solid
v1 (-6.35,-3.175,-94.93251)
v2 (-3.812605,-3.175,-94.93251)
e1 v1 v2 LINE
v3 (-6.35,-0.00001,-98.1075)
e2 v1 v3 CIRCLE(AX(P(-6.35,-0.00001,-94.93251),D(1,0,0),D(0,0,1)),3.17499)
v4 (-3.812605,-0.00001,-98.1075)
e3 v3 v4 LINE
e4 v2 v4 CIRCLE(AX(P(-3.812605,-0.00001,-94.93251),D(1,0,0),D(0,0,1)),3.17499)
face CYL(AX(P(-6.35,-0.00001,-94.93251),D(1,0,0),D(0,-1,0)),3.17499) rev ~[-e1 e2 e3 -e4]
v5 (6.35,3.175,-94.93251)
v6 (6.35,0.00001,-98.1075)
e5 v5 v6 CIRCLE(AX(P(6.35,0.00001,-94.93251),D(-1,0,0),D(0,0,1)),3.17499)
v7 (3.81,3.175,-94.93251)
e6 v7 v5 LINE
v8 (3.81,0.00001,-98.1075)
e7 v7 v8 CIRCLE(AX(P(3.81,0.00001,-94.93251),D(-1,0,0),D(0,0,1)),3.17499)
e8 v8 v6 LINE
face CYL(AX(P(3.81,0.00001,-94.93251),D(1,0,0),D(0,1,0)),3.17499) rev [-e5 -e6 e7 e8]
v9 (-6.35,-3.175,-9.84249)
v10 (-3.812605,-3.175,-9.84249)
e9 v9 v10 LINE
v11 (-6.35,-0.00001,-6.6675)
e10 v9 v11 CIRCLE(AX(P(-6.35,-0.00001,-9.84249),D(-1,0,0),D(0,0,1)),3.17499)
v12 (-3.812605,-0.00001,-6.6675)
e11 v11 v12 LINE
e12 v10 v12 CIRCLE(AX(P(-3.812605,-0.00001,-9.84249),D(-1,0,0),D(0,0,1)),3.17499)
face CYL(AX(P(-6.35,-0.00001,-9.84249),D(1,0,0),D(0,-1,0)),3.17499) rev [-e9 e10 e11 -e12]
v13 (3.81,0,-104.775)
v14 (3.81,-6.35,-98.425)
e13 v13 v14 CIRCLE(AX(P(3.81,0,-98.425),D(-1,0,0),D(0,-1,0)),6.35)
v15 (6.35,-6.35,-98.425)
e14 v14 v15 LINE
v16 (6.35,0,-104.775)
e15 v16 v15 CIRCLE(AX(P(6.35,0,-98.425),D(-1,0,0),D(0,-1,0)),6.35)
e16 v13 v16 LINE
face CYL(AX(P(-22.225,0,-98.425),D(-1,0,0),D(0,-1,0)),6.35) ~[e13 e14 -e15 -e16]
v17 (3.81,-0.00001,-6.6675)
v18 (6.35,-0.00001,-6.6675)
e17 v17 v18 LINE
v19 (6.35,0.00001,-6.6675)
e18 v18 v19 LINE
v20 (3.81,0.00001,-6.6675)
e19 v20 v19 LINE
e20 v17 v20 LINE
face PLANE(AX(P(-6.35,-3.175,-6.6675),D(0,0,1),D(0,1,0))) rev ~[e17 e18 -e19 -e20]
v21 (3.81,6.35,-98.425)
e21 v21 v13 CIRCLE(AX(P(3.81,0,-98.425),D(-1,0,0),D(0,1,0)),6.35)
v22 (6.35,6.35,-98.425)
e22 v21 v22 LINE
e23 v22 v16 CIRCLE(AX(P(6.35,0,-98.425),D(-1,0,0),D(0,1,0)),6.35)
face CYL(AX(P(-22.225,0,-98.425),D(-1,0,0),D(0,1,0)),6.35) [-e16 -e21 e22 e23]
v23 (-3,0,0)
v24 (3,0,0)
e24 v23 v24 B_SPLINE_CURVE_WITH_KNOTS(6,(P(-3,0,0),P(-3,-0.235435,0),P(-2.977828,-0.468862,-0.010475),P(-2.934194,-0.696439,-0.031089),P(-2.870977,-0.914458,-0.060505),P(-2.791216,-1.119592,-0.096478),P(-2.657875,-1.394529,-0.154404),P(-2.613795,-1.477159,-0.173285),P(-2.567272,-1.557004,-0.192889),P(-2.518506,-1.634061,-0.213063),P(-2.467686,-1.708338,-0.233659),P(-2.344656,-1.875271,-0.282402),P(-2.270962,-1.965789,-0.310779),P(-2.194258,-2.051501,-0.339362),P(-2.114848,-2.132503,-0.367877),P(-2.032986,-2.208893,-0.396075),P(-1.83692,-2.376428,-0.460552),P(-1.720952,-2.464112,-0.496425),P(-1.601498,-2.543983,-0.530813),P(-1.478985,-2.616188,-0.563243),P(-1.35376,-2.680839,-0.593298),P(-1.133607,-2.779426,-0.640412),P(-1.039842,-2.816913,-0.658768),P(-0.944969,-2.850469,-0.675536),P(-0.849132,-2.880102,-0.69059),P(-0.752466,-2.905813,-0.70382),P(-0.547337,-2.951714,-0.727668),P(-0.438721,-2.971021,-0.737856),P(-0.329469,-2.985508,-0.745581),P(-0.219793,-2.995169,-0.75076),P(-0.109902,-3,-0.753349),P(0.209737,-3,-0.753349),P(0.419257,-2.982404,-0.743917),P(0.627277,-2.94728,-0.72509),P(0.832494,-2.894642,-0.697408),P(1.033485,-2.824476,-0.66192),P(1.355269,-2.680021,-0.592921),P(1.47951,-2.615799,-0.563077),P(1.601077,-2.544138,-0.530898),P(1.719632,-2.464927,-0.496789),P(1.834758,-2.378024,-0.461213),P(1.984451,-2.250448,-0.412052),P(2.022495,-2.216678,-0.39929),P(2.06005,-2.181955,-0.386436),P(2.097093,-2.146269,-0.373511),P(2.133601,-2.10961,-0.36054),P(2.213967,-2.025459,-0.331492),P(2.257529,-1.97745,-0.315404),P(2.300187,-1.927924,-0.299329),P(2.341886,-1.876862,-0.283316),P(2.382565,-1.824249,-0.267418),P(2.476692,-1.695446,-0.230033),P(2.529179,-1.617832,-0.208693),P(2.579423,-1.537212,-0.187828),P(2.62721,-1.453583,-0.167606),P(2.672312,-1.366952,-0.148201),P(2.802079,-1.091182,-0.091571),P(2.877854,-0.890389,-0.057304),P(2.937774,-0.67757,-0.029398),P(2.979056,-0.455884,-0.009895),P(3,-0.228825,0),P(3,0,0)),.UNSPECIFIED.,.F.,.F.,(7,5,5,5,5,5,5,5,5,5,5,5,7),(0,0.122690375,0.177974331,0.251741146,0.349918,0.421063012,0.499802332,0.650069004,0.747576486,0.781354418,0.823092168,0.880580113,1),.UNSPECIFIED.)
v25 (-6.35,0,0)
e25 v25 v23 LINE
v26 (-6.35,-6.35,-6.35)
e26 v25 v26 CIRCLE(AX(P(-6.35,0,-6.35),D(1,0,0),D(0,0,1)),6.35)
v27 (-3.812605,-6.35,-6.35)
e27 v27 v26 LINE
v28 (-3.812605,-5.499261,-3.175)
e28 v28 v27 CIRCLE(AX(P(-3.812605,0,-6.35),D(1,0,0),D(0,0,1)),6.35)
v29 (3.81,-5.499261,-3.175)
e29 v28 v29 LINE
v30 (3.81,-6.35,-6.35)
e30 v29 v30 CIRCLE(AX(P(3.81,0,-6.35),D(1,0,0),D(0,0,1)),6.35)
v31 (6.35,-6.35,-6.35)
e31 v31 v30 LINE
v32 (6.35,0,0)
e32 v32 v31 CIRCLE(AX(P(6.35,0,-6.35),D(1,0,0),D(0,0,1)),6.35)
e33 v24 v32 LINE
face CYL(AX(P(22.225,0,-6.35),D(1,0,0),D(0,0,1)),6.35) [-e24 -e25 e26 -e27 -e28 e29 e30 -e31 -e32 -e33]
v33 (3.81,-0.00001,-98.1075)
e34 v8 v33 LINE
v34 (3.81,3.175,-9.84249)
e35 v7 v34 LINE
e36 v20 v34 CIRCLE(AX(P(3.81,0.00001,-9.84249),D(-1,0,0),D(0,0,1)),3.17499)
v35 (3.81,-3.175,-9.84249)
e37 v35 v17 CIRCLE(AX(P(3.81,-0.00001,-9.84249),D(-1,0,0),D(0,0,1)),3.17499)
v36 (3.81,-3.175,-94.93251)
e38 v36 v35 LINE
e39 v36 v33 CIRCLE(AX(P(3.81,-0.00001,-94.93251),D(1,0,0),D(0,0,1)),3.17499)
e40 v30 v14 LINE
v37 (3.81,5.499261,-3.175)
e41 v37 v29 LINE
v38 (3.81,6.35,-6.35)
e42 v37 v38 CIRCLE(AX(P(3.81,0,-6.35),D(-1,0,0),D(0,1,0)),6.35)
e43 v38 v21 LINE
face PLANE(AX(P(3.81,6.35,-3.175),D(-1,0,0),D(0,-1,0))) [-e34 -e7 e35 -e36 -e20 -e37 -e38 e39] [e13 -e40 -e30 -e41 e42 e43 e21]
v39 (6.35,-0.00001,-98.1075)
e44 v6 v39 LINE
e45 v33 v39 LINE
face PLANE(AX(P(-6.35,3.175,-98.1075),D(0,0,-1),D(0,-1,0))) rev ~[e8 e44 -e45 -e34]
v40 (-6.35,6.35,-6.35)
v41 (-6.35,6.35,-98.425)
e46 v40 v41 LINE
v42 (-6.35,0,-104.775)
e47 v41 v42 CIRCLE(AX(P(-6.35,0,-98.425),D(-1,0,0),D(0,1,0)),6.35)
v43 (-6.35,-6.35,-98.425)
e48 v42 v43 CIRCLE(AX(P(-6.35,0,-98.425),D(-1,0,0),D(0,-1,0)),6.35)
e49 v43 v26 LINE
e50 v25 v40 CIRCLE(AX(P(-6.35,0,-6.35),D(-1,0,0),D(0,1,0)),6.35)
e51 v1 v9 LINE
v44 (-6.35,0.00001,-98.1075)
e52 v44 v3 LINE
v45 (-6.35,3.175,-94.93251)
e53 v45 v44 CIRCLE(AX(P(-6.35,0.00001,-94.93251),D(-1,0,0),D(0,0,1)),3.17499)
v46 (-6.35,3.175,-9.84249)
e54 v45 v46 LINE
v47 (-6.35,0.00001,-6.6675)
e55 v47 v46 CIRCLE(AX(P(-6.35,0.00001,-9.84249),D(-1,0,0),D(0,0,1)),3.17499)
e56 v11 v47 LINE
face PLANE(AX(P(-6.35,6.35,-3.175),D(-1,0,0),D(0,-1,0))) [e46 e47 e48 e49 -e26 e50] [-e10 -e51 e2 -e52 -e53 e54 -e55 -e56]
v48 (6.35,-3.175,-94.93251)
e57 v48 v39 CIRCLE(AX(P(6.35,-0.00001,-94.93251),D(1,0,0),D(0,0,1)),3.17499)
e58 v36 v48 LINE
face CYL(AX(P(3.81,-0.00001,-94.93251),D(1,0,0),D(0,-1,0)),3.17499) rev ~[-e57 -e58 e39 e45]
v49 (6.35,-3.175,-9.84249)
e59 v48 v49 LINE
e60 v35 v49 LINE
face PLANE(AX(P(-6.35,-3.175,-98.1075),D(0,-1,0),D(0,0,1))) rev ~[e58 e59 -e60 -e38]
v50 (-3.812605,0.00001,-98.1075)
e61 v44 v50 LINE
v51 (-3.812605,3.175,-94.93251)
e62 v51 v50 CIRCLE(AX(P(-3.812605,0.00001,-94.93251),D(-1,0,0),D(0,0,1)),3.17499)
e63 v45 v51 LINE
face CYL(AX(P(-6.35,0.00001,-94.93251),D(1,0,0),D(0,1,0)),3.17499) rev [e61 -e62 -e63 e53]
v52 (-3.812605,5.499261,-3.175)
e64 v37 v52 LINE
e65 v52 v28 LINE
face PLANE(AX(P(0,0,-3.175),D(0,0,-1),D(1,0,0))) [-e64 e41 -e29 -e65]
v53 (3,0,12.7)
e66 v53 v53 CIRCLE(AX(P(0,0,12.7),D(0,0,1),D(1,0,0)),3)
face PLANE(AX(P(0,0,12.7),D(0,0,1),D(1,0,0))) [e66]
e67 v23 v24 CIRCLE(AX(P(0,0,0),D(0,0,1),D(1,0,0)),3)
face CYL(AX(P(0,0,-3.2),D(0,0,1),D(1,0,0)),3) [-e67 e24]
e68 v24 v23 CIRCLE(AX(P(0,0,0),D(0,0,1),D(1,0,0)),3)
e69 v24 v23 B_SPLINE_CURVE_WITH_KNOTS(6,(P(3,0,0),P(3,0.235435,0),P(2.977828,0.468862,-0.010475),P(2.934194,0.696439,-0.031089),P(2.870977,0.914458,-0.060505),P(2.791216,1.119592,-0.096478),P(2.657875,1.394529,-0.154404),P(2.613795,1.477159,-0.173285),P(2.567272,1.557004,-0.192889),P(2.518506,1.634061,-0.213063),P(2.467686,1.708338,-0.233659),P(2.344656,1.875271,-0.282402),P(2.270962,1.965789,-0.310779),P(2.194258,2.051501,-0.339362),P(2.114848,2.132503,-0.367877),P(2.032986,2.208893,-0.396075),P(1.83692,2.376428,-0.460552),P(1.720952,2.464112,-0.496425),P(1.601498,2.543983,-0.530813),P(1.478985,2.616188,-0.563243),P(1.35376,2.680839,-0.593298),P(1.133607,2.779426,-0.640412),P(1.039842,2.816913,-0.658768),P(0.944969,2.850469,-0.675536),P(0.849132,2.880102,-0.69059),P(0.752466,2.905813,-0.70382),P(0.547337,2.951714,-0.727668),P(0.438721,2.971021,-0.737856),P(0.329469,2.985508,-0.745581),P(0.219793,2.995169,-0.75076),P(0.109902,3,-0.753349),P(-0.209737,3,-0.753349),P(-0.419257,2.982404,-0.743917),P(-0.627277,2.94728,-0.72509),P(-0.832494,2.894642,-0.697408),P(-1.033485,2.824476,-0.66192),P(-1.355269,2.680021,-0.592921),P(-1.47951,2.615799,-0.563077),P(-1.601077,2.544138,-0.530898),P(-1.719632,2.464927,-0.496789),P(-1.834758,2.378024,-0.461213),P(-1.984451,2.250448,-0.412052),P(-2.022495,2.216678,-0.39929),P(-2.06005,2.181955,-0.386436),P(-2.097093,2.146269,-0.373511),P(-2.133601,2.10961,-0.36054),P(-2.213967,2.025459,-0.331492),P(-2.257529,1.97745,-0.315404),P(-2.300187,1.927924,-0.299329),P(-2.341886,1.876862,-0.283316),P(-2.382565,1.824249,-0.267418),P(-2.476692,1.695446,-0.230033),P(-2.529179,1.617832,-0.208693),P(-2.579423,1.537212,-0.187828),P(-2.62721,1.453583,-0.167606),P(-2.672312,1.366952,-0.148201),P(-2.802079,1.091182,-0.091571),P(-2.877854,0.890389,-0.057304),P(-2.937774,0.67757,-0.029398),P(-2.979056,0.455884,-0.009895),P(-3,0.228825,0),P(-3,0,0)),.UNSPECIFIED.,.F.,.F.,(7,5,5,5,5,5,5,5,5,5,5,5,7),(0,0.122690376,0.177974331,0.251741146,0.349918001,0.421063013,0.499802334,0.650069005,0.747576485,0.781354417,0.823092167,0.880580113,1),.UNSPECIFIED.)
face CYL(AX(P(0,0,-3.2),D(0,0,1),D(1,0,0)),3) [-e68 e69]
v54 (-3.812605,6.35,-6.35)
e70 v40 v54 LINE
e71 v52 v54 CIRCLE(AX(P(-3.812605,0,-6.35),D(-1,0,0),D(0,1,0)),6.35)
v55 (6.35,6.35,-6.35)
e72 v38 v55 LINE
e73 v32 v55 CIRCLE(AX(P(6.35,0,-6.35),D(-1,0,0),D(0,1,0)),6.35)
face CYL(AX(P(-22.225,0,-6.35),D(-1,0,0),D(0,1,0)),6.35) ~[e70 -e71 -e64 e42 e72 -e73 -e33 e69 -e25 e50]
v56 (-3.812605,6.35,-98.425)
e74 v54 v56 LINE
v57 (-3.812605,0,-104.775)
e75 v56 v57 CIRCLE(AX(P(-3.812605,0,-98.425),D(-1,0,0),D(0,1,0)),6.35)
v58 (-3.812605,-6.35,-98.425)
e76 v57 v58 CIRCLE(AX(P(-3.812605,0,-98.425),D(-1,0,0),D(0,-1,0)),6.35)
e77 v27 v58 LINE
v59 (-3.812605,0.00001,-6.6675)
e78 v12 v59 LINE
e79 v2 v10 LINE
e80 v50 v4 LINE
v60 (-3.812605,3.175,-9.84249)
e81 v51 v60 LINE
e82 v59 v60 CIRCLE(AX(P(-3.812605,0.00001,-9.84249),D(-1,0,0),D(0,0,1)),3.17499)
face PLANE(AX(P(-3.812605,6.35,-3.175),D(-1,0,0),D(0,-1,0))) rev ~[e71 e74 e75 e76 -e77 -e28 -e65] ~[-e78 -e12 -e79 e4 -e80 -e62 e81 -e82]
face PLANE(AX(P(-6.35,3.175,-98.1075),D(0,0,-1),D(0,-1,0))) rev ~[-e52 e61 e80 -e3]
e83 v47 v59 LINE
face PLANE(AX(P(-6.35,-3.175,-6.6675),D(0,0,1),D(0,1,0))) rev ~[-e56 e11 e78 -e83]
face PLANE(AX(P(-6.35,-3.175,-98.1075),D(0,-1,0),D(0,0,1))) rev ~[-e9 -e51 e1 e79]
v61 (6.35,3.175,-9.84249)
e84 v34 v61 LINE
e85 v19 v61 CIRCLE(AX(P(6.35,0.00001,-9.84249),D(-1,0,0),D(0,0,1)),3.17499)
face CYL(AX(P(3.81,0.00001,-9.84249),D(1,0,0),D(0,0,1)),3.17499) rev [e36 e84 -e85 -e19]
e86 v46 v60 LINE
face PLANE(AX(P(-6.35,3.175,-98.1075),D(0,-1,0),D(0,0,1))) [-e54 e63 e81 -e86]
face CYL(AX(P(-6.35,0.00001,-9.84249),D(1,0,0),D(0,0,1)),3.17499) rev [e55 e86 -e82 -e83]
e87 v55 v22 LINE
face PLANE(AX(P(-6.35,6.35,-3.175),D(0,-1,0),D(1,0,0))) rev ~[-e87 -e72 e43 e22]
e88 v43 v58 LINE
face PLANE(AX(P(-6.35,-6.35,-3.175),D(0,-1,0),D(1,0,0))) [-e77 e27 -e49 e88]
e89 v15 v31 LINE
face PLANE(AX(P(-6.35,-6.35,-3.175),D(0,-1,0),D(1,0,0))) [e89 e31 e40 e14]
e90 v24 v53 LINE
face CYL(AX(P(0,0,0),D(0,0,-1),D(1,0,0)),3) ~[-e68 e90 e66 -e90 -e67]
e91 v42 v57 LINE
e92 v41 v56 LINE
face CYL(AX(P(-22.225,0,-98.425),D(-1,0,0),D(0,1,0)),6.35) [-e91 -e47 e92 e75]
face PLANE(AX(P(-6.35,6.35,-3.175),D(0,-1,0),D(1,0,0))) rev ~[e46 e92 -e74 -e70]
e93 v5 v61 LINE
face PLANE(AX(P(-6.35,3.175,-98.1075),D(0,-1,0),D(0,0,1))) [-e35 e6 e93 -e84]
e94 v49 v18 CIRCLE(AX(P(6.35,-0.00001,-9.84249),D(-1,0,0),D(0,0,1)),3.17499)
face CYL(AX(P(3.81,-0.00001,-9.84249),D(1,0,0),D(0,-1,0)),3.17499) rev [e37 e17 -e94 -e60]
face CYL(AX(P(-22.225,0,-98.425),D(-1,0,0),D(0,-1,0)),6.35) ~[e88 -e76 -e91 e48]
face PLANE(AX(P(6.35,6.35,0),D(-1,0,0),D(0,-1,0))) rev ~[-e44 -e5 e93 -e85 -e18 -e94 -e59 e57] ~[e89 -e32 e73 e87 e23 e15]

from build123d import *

# Parameters (mm, degrees)
F0_R         = 3
F1_DEPTH     = 12.7
F2_W         = 12.7
F2_H         = 12.7
F3_DEPTH     = 3.175
F4_W         = 2.5373954162
F4_H         = 12.7
F4_W_2       = 2.54
F5_DEPTH     = 101.6
F6_T1_DEPTH  = 34.2873954162
F6_T3_DEPTH  = 34.29
F6_T8_DEPTH  = 44.45
F6_S9_R      = 3
F6_T10_DEPTH = 24
F6_T14_DEPTH = 44.45
F6_S15_R     = 3
F6_T16_DEPTH = 24
F7_W         = 3.175
F7_H         = 91.44
F8_DEPTH     = 25.4
F9_R         = 3.17499


# Not quite as in the source:
# - a fillet or chamfer that OpenCascade refuses, or shapes differently, is made with other operations: its cross-section is extruded or revolved along the edge and cut away or added
# - a fillet or chamfer is up to 0.001 mm smaller than in the source, because OpenCascade refuses the exact size


with BuildPart() as f1:
    # F0 (on Top) → F1 (new body)
    with BuildSketch(Plane.XY):
        Circle(F0_R)
    extrude(amount=F1_DEPTH)

    # F2 (on face) → F3 (join)
    with BuildSketch(Plane(origin=(0, 0, 0), x_dir=(1, 0, 0), z_dir=(0, 0, -1))):
        Rectangle(F2_W, F2_H)
    extrude(amount=F3_DEPTH)

    # F4 (on face) → F5 (join)
    with BuildSketch(Plane(origin=(0, 0, -3.175), x_dir=(1, 0, 0), z_dir=(0, 0, -1))):
        with Locations((-5.0813022919, 0)):
            Rectangle(F4_W, F4_H)
        with Locations((5.08, 0)):
            Rectangle(F4_W_2, F4_H)
    extrude(amount=F5_DEPTH)

    # F6: fillet of radius 6.35 on 6 edges, made by hand

    # F6_s2 → F6_t1 (cut)
    with BuildSketch(Plane.YZ.offset(-22.225)):
        with BuildLine():
            ThreePointArc((-6.35, -98.425), (-4.4901280605, -102.9151280605), (0, -104.775))
            Line((0, -104.775), (-6.35, -104.775))
            Line((-6.35, -104.775), (-6.35, -98.425))
        make_face()
        with BuildLine():
            ThreePointArc((6.35, -98.425), (4.4901280605, -102.9151280605), (0, -104.775))
            Line((0, -104.775), (6.35, -104.775))
            Line((6.35, -104.775), (6.35, -98.425))
        make_face()
    extrude(amount=F6_T1_DEPTH, mode=Mode.SUBTRACT)

    # F6_s4 → F6_t3 (cut)
    with BuildSketch(Plane.YZ.offset(-12.065)):
        with BuildLine():
            ThreePointArc((6.35, -98.425), (4.4901280605, -102.9151280605), (0, -104.775))
            Line((0, -104.775), (6.35, -104.775))
            Line((6.35, -104.775), (6.35, -98.425))
        make_face()
        with BuildLine():
            ThreePointArc((-6.35, -98.425), (-4.4901280605, -102.9151280605), (0, -104.775))
            Line((0, -104.775), (-6.35, -104.775))
            Line((-6.35, -104.775), (-6.35, -98.425))
        make_face()
    extrude(amount=F6_T3_DEPTH, mode=Mode.SUBTRACT)


with BuildPart() as f6_tool6:
    # F6_s7 → F6_t8 (new body)
    with BuildSketch(Plane.YZ.offset(-22.225)):
        with BuildLine():
            ThreePointArc((6.35, -6.35), (4.4901280605, -1.8598719395), (0, 0))
            Line((0, 0), (6.35, 0))
            Line((6.35, 0), (6.35, -6.35))
        make_face()
    extrude(amount=F6_T8_DEPTH)

    # F6_s9 → F6_t10 (cut, symmetric)
    with BuildSketch(Plane.XY.offset(-3.2)):
        Circle(F6_S9_R)
    extrude(amount=F6_T10_DEPTH, both=True, mode=Mode.SUBTRACT)


with BuildPart() as f1_1:
    add(f1.part)

    # F6_t5: cut F6_tool6
    add(f6_tool6.part, mode=Mode.SUBTRACT)


with BuildPart() as f6_tool12:
    # F6_s13 → F6_t14 (new body)
    with BuildSketch(Plane.YZ.offset(22.225)):
        with BuildLine():
            ThreePointArc((0, 0), (-4.4901280605, -1.8598719395), (-6.35, -6.35))
            Line((-6.35, -6.35), (-6.35, 0))
            Line((-6.35, 0), (0, 0))
        make_face()
    extrude(amount=-F6_T14_DEPTH)

    # F6_s15 → F6_t16 (cut, symmetric)
    with BuildSketch(Plane.XY.offset(-3.2)):
        Circle(F6_S15_R)
    extrude(amount=F6_T16_DEPTH, both=True, mode=Mode.SUBTRACT)


with BuildPart() as f1_2:
    add(f1_1.part)

    # F6_t11: cut F6_tool12
    add(f6_tool12.part, mode=Mode.SUBTRACT)

    # F7 (on face) → F8 (cut)
    with BuildSketch(Plane(origin=(-6.35, 0, 0), x_dir=(0, -1, 0), z_dir=(-1, 0, 0))):
        with Locations((1.5875, -52.3875)):
            Rectangle(F7_W, F7_H)
        with Locations((-1.5875, -52.3875)):
            Rectangle(F7_W, F7_H)
    extrude(amount=-F8_DEPTH, mode=Mode.SUBTRACT)

    # F9 (radius 3.175 in the source; OpenCascade refuses exactly that, so slightly less here)
    f9_edges = [f1_2.edges().sort_by_distance(p)[0] for p in [
        (-5.081302, -3.175, -98.1075),
        (-5.081302, -3.175, -6.6675),
        (-5.081302, 3.175, -6.6675),
        (5.08, 3.175, -6.6675),
        (5.08, -3.175, -6.6675),
        (-5.081302, 3.175, -98.1075),
        (5.08, 3.175, -98.1075),
        (5.08, -3.175, -98.1075),
    ]]
    fillet(f9_edges, radius=F9_R)


solid = f1_2.part
